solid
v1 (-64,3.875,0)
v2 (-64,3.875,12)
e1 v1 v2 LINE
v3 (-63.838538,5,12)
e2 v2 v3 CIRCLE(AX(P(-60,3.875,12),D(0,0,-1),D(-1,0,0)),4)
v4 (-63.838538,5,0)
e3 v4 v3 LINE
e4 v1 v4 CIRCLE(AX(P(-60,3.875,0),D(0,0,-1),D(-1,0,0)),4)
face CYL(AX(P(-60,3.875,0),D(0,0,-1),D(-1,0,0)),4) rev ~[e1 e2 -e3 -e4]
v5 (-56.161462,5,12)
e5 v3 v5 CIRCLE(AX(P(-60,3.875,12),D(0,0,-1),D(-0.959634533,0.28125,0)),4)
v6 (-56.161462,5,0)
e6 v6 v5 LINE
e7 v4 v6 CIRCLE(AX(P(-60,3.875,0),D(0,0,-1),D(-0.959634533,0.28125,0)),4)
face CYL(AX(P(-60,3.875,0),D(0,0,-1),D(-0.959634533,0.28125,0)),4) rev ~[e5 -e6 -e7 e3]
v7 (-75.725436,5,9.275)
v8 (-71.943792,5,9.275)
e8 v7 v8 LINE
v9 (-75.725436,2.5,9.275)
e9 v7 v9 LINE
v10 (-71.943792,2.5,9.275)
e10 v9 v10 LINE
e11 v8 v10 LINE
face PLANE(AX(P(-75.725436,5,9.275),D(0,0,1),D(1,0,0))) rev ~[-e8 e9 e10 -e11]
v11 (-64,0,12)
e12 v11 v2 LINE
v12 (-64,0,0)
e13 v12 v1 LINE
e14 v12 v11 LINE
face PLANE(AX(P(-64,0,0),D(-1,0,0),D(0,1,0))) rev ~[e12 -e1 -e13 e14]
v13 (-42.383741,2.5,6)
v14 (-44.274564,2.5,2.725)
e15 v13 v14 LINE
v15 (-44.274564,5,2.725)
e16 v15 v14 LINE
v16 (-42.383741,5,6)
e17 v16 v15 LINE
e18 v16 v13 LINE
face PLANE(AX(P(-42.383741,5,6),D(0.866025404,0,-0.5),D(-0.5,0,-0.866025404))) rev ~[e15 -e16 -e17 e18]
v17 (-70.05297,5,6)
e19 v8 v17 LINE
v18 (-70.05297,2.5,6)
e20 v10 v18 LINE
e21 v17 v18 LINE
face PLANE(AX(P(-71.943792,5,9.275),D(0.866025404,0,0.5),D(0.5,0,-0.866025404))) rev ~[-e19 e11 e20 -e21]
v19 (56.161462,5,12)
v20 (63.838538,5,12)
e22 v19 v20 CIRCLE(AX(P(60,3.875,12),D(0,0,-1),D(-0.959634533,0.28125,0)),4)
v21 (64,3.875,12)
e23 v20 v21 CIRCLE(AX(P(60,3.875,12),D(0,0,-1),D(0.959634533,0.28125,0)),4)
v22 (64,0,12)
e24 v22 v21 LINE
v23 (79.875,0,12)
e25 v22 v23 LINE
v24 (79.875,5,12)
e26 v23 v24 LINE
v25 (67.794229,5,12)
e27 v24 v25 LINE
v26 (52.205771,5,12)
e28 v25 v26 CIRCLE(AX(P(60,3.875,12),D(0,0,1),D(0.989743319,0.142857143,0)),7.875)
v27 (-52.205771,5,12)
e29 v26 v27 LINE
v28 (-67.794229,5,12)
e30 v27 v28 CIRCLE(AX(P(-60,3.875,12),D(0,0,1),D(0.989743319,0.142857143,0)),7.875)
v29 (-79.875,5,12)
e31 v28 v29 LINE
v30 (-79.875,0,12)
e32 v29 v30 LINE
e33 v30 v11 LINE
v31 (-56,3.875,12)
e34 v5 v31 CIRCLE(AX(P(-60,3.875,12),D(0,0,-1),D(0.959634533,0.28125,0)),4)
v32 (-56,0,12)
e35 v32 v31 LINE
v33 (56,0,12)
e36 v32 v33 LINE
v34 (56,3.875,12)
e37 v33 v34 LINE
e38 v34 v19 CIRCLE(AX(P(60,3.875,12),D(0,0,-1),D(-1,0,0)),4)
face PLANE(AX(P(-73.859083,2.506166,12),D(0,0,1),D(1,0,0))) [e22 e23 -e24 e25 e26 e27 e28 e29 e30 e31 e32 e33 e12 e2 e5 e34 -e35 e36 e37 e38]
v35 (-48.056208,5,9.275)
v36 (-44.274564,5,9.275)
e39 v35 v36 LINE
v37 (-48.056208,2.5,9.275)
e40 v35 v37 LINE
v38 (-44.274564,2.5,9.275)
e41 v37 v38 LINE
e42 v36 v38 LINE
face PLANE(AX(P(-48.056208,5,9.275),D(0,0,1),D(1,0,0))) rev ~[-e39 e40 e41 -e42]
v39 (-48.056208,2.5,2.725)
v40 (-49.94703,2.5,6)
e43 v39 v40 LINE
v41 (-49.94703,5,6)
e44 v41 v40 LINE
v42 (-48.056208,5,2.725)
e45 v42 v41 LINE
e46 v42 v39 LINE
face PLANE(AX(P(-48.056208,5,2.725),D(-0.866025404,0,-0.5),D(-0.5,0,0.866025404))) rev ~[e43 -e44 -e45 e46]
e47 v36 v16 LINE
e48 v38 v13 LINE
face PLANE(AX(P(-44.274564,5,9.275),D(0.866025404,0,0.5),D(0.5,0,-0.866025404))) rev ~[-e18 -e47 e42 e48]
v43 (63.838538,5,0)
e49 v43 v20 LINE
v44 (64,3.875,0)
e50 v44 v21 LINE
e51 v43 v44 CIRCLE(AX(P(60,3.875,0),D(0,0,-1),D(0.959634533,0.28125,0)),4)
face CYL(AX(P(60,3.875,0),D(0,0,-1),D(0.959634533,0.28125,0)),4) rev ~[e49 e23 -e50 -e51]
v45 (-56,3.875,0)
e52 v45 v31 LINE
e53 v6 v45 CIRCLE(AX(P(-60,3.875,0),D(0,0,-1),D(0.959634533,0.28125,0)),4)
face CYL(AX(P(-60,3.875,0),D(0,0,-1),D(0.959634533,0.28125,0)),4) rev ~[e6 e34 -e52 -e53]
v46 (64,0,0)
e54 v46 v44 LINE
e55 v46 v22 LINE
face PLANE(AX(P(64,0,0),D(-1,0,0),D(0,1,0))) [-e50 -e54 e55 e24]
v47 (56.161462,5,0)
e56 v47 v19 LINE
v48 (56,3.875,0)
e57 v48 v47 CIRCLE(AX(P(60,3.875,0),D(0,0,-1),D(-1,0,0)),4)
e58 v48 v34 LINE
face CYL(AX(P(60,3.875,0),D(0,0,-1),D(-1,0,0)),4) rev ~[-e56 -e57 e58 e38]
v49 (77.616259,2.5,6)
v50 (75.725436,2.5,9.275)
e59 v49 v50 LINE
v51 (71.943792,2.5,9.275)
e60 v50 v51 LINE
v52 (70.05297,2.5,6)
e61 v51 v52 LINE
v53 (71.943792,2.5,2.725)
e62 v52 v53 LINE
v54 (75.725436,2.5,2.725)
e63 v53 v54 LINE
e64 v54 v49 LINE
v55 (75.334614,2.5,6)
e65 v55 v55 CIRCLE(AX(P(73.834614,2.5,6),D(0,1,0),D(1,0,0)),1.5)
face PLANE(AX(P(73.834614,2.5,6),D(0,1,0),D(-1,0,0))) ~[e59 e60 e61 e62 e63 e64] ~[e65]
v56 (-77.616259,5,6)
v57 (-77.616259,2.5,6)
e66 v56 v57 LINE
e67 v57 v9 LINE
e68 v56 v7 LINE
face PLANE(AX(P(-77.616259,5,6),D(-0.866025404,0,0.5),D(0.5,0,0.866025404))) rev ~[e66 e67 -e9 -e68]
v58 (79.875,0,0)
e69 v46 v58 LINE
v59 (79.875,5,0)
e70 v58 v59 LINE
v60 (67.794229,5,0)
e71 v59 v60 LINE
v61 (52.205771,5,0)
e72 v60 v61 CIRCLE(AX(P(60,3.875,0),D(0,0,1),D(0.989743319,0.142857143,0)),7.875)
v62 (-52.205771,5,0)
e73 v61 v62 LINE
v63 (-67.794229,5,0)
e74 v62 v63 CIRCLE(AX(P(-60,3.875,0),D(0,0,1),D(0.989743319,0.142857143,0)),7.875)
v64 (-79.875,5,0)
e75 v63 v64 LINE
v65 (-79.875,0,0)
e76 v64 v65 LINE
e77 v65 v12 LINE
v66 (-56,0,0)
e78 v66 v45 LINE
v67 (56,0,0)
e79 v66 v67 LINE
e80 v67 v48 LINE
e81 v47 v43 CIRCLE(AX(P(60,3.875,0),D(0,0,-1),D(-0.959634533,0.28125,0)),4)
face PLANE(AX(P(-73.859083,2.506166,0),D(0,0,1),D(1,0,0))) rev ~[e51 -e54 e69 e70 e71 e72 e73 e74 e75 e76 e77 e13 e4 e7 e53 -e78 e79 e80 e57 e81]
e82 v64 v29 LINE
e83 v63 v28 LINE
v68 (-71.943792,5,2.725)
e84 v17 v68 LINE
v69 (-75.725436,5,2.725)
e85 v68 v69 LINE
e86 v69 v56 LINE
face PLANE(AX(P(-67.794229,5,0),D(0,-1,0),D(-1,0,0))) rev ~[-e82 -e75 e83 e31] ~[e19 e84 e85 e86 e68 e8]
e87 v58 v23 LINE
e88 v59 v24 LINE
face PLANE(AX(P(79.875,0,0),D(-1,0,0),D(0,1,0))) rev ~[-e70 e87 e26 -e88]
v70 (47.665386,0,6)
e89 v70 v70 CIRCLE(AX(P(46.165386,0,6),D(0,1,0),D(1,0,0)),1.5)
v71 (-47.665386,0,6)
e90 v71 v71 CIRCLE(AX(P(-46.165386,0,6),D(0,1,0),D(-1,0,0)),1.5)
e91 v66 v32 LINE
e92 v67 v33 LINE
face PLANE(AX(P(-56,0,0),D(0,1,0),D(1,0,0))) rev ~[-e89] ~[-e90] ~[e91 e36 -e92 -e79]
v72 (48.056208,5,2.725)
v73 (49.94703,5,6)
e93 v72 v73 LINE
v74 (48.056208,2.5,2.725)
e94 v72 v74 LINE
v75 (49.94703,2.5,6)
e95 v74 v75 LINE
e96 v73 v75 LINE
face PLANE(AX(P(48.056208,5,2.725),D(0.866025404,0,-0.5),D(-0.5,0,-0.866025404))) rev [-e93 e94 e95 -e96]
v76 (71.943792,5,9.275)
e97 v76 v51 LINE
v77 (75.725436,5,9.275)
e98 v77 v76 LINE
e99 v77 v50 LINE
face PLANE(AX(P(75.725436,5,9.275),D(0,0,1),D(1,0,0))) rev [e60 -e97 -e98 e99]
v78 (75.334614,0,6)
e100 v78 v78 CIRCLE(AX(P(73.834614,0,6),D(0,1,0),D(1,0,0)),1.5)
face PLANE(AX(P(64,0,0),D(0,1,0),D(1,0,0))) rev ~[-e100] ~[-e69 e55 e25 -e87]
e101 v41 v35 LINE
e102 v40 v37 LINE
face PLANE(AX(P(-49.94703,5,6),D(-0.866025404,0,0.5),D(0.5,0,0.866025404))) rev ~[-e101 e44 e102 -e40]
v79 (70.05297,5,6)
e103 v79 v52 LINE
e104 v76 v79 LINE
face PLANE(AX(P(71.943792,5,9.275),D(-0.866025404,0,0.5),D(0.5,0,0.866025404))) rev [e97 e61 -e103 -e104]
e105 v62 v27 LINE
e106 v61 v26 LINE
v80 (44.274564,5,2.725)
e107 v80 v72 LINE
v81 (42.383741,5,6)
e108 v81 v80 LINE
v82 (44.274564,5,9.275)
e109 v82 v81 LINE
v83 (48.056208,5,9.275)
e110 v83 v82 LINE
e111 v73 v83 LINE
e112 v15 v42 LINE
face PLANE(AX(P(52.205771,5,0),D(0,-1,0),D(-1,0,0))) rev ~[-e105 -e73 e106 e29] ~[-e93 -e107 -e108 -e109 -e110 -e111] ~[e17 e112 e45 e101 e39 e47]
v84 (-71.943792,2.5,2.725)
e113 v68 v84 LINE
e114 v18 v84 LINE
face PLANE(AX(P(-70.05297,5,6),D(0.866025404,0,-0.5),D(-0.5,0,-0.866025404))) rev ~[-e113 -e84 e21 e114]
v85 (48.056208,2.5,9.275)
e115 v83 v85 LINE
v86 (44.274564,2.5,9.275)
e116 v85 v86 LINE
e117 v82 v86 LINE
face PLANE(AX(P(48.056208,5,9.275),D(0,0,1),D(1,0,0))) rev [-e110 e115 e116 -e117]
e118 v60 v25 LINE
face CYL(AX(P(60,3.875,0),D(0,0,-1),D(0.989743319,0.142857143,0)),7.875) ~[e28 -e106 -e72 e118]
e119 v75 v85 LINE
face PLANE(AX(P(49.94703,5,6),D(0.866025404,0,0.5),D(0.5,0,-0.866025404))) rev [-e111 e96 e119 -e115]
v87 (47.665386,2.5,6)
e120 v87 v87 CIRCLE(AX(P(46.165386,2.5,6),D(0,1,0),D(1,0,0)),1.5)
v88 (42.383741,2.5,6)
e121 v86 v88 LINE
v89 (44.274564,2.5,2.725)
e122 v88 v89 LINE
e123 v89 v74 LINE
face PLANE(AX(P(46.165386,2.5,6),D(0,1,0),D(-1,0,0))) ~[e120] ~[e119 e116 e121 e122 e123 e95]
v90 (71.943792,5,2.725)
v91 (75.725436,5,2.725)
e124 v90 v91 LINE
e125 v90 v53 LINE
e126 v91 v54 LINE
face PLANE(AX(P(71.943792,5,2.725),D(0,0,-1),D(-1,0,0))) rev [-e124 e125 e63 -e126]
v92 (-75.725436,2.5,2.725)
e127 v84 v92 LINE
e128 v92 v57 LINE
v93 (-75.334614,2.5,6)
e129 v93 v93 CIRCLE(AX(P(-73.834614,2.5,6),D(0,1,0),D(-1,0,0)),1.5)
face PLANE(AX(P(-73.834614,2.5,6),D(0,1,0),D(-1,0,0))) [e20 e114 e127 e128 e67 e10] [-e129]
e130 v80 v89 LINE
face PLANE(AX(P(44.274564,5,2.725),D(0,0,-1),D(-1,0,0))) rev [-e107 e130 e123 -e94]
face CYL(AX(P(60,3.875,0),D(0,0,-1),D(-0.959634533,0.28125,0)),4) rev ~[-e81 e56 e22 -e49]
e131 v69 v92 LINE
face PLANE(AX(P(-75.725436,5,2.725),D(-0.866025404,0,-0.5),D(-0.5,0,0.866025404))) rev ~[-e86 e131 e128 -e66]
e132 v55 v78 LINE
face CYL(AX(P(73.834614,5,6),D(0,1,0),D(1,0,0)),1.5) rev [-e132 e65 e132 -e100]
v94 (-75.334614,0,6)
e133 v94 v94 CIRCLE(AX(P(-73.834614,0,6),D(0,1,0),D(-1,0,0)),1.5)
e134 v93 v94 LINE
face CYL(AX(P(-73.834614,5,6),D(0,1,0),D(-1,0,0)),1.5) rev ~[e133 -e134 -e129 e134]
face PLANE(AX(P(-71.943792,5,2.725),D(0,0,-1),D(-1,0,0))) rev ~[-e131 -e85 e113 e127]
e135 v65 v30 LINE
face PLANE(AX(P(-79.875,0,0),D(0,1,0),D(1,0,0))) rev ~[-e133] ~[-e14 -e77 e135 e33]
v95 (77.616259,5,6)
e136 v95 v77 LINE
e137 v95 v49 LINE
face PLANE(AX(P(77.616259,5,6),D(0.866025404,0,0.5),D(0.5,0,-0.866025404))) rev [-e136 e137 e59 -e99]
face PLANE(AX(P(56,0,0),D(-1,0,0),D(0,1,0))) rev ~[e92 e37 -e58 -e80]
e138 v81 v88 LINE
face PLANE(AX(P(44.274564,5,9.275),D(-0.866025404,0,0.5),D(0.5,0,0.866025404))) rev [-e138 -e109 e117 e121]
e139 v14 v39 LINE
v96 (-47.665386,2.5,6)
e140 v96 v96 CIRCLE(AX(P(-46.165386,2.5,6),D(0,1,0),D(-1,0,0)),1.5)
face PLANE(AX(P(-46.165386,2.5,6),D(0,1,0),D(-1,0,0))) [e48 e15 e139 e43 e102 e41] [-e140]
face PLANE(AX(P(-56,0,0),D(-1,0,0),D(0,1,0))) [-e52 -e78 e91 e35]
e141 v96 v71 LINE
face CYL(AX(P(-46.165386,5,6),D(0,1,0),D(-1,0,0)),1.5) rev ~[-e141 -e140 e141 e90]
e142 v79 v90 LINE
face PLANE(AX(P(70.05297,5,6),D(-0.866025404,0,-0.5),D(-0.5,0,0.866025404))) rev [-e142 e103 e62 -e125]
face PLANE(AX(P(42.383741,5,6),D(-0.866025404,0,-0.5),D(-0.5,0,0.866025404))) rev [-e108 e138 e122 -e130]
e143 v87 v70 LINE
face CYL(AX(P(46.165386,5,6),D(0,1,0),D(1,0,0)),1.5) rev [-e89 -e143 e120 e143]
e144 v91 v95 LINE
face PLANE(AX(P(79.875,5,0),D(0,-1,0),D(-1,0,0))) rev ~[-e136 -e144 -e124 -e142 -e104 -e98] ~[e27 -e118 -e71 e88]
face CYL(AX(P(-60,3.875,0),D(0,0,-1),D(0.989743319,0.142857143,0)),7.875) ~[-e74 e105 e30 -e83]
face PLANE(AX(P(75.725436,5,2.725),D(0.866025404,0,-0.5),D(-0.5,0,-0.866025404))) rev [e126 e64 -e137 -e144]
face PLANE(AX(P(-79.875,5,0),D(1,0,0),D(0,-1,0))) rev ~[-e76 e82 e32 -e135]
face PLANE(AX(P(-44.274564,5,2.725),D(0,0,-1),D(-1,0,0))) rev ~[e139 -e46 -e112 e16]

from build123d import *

# Parameters (mm, degrees)
F0_W     = 3.875
F0_H     = 3.875
F1_DEPTH = 12
F3_DEPTH = 2.5
F4_R     = 1.5
F5_DEPTH = 5.001


# Not quite as in the source:
# - a pattern or mirror of a feature is missing from the dataset's text; its kind, count and spacing are read off the source's solid
# - a feature names something its author has since deleted; it is built from what else it names


with BuildPart() as f1:
    # F0 (on Top) → F1 (new body)
    with BuildSketch(Plane.XY):
        with BuildLine():
            Line((-67.7942286341, 5), (-79.875, 5))
            Line((-79.875, 5), (-79.875, 0))
            Line((-79.875, 0), (-67.875, 0))
            Line((-67.875, 0), (-67.875, 3.875))
            ThreePointArc((-67.875, 3.875), (-67.854781203, 4.4389479173), (-67.7942286341, 5))
        make_face()
        with BuildLine():
            ThreePointArc((-52.2057713659, 5), (-60, 11.75), (-67.7942286341, 5))
            Line((-67.7942286341, 5), (-63.8385381332, 5))
            ThreePointArc((-63.8385381332, 5), (-60, 7.875), (-56.1614618668, 5))
            Line((-56.1614618668, 5), (-52.2057713659, 5))
        make_face()
        with BuildLine():
            Line((-63.8385381332, 5), (-67.7942286341, 5))
            ThreePointArc((-67.7942286341, 5), (-67.854781203, 4.4389479173), (-67.875, 3.875))
            Line((-67.875, 3.875), (-64, 3.875))
            ThreePointArc((-64, 3.875), (-63.9594287803, 4.4432637888), (-63.8385381332, 5))
        make_face()
        with BuildLine():
            ThreePointArc((-52.125, 3.875), (-52.145218797, 4.4389479173), (-52.2057713659, 5))
            Line((-52.2057713659, 5), (-56.1614618668, 5))
            ThreePointArc((-56.1614618668, 5), (-56.0405712197, 4.4432637888), (-56, 3.875))
            Line((-56, 3.875), (-52.125, 3.875))
        make_face()
        with BuildLine():
            Line((52.2057713659, 5), (-52.2057713659, 5))
            ThreePointArc((-52.2057713659, 5), (-52.145218797, 4.4389479173), (-52.125, 3.875))
            Line((-52.125, 3.875), (-52.125, 0))
            Line((-52.125, 0), (52.125, 0))
            Line((52.125, 0), (52.125, 3.875))
            ThreePointArc((52.125, 3.875), (52.145218797, 4.4389479173), (52.2057713659, 5))
        make_face()
        with Locations((-65.9375, 1.9375)):
            Rectangle(F0_W, F0_H)
        with BuildLine():
            ThreePointArc((67.7942286341, 5), (60, 11.75), (52.2057713659, 5))
            Line((52.2057713659, 5), (56.1614618668, 5))
            ThreePointArc((56.1614618668, 5), (60, 7.875), (63.8385381332, 5))
            Line((63.8385381332, 5), (67.7942286341, 5))
        make_face()
        with BuildLine():
            Line((56.1614618668, 5), (52.2057713659, 5))
            ThreePointArc((52.2057713659, 5), (52.145218797, 4.4389479173), (52.125, 3.875))
            Line((52.125, 3.875), (56, 3.875))
            ThreePointArc((56, 3.875), (56.0405712197, 4.4432637888), (56.1614618668, 5))
        make_face()
        with Locations((-54.0625, 1.9375)):
            Rectangle(F0_W, F0_H)
        with BuildLine():
            ThreePointArc((67.875, 3.875), (67.854781203, 4.4389479173), (67.7942286341, 5))
            Line((67.7942286341, 5), (63.8385381332, 5))
            ThreePointArc((63.8385381332, 5), (63.9594287803, 4.4432637888), (64, 3.875))
            Line((64, 3.875), (67.875, 3.875))
        make_face()
        with BuildLine():
            Line((79.875, 5), (67.7942286341, 5))
            ThreePointArc((67.7942286341, 5), (67.854781203, 4.4389479173), (67.875, 3.875))
            Line((67.875, 3.875), (67.875, 0))
            Line((67.875, 0), (79.875, 0))
            Line((79.875, 0), (79.875, 5))
        make_face()
        with Locations((54.0625, 1.9375)):
            Rectangle(F0_W, F0_H)
        with Locations((65.9375, 1.9375)):
            Rectangle(F0_W, F0_H)
    extrude(amount=F1_DEPTH)

    # F2 (on face) → F3 (cut)
    with BuildSketch(Plane(origin=(0, 5, 0), x_dir=(-1, 0, 0), z_dir=(0, 1, 0))):
        Polygon((44.2745635514, 2.725), (48.0562078146, 2.725), (49.9470299462, 6), (48.0562078146, 9.275), (44.2745635514, 9.275), (42.3837414198, 6), align=None)
        Polygon((71.9437921854, 2.725), (75.7254364486, 2.725), (77.6162585802, 6), (75.7254364486, 9.275), (71.9437921854, 9.275), (70.0529700538, 6), align=None)
    f3 = extrude(amount=-F3_DEPTH, mode=Mode.SUBTRACT)

    # F3_copies: F3 across plane
    add(f3.mirror(Plane(origin=(0, 0, 0), x_dir=(0, 0, 1), z_dir=(1, 0, 0))), mode=Mode.SUBTRACT)

    # F4 (on face) → F5 (cut, through all)
    with BuildSketch(Plane(origin=(0, 5, 0), x_dir=(-1, 0, 0), z_dir=(0, 1, 0))):
        with Locations((46.165385683, 6)):
            Circle(F4_R)
        with Locations((73.834614317, 6)):
            Circle(F4_R)
    f5 = extrude(amount=-F5_DEPTH, mode=Mode.SUBTRACT)

    # F5_copies: F5 across plane
    add(f5.mirror(Plane(origin=(0, 0, 0), x_dir=(0, 0, 1), z_dir=(1, 0, 0))), mode=Mode.SUBTRACT)


solid = f1.part
